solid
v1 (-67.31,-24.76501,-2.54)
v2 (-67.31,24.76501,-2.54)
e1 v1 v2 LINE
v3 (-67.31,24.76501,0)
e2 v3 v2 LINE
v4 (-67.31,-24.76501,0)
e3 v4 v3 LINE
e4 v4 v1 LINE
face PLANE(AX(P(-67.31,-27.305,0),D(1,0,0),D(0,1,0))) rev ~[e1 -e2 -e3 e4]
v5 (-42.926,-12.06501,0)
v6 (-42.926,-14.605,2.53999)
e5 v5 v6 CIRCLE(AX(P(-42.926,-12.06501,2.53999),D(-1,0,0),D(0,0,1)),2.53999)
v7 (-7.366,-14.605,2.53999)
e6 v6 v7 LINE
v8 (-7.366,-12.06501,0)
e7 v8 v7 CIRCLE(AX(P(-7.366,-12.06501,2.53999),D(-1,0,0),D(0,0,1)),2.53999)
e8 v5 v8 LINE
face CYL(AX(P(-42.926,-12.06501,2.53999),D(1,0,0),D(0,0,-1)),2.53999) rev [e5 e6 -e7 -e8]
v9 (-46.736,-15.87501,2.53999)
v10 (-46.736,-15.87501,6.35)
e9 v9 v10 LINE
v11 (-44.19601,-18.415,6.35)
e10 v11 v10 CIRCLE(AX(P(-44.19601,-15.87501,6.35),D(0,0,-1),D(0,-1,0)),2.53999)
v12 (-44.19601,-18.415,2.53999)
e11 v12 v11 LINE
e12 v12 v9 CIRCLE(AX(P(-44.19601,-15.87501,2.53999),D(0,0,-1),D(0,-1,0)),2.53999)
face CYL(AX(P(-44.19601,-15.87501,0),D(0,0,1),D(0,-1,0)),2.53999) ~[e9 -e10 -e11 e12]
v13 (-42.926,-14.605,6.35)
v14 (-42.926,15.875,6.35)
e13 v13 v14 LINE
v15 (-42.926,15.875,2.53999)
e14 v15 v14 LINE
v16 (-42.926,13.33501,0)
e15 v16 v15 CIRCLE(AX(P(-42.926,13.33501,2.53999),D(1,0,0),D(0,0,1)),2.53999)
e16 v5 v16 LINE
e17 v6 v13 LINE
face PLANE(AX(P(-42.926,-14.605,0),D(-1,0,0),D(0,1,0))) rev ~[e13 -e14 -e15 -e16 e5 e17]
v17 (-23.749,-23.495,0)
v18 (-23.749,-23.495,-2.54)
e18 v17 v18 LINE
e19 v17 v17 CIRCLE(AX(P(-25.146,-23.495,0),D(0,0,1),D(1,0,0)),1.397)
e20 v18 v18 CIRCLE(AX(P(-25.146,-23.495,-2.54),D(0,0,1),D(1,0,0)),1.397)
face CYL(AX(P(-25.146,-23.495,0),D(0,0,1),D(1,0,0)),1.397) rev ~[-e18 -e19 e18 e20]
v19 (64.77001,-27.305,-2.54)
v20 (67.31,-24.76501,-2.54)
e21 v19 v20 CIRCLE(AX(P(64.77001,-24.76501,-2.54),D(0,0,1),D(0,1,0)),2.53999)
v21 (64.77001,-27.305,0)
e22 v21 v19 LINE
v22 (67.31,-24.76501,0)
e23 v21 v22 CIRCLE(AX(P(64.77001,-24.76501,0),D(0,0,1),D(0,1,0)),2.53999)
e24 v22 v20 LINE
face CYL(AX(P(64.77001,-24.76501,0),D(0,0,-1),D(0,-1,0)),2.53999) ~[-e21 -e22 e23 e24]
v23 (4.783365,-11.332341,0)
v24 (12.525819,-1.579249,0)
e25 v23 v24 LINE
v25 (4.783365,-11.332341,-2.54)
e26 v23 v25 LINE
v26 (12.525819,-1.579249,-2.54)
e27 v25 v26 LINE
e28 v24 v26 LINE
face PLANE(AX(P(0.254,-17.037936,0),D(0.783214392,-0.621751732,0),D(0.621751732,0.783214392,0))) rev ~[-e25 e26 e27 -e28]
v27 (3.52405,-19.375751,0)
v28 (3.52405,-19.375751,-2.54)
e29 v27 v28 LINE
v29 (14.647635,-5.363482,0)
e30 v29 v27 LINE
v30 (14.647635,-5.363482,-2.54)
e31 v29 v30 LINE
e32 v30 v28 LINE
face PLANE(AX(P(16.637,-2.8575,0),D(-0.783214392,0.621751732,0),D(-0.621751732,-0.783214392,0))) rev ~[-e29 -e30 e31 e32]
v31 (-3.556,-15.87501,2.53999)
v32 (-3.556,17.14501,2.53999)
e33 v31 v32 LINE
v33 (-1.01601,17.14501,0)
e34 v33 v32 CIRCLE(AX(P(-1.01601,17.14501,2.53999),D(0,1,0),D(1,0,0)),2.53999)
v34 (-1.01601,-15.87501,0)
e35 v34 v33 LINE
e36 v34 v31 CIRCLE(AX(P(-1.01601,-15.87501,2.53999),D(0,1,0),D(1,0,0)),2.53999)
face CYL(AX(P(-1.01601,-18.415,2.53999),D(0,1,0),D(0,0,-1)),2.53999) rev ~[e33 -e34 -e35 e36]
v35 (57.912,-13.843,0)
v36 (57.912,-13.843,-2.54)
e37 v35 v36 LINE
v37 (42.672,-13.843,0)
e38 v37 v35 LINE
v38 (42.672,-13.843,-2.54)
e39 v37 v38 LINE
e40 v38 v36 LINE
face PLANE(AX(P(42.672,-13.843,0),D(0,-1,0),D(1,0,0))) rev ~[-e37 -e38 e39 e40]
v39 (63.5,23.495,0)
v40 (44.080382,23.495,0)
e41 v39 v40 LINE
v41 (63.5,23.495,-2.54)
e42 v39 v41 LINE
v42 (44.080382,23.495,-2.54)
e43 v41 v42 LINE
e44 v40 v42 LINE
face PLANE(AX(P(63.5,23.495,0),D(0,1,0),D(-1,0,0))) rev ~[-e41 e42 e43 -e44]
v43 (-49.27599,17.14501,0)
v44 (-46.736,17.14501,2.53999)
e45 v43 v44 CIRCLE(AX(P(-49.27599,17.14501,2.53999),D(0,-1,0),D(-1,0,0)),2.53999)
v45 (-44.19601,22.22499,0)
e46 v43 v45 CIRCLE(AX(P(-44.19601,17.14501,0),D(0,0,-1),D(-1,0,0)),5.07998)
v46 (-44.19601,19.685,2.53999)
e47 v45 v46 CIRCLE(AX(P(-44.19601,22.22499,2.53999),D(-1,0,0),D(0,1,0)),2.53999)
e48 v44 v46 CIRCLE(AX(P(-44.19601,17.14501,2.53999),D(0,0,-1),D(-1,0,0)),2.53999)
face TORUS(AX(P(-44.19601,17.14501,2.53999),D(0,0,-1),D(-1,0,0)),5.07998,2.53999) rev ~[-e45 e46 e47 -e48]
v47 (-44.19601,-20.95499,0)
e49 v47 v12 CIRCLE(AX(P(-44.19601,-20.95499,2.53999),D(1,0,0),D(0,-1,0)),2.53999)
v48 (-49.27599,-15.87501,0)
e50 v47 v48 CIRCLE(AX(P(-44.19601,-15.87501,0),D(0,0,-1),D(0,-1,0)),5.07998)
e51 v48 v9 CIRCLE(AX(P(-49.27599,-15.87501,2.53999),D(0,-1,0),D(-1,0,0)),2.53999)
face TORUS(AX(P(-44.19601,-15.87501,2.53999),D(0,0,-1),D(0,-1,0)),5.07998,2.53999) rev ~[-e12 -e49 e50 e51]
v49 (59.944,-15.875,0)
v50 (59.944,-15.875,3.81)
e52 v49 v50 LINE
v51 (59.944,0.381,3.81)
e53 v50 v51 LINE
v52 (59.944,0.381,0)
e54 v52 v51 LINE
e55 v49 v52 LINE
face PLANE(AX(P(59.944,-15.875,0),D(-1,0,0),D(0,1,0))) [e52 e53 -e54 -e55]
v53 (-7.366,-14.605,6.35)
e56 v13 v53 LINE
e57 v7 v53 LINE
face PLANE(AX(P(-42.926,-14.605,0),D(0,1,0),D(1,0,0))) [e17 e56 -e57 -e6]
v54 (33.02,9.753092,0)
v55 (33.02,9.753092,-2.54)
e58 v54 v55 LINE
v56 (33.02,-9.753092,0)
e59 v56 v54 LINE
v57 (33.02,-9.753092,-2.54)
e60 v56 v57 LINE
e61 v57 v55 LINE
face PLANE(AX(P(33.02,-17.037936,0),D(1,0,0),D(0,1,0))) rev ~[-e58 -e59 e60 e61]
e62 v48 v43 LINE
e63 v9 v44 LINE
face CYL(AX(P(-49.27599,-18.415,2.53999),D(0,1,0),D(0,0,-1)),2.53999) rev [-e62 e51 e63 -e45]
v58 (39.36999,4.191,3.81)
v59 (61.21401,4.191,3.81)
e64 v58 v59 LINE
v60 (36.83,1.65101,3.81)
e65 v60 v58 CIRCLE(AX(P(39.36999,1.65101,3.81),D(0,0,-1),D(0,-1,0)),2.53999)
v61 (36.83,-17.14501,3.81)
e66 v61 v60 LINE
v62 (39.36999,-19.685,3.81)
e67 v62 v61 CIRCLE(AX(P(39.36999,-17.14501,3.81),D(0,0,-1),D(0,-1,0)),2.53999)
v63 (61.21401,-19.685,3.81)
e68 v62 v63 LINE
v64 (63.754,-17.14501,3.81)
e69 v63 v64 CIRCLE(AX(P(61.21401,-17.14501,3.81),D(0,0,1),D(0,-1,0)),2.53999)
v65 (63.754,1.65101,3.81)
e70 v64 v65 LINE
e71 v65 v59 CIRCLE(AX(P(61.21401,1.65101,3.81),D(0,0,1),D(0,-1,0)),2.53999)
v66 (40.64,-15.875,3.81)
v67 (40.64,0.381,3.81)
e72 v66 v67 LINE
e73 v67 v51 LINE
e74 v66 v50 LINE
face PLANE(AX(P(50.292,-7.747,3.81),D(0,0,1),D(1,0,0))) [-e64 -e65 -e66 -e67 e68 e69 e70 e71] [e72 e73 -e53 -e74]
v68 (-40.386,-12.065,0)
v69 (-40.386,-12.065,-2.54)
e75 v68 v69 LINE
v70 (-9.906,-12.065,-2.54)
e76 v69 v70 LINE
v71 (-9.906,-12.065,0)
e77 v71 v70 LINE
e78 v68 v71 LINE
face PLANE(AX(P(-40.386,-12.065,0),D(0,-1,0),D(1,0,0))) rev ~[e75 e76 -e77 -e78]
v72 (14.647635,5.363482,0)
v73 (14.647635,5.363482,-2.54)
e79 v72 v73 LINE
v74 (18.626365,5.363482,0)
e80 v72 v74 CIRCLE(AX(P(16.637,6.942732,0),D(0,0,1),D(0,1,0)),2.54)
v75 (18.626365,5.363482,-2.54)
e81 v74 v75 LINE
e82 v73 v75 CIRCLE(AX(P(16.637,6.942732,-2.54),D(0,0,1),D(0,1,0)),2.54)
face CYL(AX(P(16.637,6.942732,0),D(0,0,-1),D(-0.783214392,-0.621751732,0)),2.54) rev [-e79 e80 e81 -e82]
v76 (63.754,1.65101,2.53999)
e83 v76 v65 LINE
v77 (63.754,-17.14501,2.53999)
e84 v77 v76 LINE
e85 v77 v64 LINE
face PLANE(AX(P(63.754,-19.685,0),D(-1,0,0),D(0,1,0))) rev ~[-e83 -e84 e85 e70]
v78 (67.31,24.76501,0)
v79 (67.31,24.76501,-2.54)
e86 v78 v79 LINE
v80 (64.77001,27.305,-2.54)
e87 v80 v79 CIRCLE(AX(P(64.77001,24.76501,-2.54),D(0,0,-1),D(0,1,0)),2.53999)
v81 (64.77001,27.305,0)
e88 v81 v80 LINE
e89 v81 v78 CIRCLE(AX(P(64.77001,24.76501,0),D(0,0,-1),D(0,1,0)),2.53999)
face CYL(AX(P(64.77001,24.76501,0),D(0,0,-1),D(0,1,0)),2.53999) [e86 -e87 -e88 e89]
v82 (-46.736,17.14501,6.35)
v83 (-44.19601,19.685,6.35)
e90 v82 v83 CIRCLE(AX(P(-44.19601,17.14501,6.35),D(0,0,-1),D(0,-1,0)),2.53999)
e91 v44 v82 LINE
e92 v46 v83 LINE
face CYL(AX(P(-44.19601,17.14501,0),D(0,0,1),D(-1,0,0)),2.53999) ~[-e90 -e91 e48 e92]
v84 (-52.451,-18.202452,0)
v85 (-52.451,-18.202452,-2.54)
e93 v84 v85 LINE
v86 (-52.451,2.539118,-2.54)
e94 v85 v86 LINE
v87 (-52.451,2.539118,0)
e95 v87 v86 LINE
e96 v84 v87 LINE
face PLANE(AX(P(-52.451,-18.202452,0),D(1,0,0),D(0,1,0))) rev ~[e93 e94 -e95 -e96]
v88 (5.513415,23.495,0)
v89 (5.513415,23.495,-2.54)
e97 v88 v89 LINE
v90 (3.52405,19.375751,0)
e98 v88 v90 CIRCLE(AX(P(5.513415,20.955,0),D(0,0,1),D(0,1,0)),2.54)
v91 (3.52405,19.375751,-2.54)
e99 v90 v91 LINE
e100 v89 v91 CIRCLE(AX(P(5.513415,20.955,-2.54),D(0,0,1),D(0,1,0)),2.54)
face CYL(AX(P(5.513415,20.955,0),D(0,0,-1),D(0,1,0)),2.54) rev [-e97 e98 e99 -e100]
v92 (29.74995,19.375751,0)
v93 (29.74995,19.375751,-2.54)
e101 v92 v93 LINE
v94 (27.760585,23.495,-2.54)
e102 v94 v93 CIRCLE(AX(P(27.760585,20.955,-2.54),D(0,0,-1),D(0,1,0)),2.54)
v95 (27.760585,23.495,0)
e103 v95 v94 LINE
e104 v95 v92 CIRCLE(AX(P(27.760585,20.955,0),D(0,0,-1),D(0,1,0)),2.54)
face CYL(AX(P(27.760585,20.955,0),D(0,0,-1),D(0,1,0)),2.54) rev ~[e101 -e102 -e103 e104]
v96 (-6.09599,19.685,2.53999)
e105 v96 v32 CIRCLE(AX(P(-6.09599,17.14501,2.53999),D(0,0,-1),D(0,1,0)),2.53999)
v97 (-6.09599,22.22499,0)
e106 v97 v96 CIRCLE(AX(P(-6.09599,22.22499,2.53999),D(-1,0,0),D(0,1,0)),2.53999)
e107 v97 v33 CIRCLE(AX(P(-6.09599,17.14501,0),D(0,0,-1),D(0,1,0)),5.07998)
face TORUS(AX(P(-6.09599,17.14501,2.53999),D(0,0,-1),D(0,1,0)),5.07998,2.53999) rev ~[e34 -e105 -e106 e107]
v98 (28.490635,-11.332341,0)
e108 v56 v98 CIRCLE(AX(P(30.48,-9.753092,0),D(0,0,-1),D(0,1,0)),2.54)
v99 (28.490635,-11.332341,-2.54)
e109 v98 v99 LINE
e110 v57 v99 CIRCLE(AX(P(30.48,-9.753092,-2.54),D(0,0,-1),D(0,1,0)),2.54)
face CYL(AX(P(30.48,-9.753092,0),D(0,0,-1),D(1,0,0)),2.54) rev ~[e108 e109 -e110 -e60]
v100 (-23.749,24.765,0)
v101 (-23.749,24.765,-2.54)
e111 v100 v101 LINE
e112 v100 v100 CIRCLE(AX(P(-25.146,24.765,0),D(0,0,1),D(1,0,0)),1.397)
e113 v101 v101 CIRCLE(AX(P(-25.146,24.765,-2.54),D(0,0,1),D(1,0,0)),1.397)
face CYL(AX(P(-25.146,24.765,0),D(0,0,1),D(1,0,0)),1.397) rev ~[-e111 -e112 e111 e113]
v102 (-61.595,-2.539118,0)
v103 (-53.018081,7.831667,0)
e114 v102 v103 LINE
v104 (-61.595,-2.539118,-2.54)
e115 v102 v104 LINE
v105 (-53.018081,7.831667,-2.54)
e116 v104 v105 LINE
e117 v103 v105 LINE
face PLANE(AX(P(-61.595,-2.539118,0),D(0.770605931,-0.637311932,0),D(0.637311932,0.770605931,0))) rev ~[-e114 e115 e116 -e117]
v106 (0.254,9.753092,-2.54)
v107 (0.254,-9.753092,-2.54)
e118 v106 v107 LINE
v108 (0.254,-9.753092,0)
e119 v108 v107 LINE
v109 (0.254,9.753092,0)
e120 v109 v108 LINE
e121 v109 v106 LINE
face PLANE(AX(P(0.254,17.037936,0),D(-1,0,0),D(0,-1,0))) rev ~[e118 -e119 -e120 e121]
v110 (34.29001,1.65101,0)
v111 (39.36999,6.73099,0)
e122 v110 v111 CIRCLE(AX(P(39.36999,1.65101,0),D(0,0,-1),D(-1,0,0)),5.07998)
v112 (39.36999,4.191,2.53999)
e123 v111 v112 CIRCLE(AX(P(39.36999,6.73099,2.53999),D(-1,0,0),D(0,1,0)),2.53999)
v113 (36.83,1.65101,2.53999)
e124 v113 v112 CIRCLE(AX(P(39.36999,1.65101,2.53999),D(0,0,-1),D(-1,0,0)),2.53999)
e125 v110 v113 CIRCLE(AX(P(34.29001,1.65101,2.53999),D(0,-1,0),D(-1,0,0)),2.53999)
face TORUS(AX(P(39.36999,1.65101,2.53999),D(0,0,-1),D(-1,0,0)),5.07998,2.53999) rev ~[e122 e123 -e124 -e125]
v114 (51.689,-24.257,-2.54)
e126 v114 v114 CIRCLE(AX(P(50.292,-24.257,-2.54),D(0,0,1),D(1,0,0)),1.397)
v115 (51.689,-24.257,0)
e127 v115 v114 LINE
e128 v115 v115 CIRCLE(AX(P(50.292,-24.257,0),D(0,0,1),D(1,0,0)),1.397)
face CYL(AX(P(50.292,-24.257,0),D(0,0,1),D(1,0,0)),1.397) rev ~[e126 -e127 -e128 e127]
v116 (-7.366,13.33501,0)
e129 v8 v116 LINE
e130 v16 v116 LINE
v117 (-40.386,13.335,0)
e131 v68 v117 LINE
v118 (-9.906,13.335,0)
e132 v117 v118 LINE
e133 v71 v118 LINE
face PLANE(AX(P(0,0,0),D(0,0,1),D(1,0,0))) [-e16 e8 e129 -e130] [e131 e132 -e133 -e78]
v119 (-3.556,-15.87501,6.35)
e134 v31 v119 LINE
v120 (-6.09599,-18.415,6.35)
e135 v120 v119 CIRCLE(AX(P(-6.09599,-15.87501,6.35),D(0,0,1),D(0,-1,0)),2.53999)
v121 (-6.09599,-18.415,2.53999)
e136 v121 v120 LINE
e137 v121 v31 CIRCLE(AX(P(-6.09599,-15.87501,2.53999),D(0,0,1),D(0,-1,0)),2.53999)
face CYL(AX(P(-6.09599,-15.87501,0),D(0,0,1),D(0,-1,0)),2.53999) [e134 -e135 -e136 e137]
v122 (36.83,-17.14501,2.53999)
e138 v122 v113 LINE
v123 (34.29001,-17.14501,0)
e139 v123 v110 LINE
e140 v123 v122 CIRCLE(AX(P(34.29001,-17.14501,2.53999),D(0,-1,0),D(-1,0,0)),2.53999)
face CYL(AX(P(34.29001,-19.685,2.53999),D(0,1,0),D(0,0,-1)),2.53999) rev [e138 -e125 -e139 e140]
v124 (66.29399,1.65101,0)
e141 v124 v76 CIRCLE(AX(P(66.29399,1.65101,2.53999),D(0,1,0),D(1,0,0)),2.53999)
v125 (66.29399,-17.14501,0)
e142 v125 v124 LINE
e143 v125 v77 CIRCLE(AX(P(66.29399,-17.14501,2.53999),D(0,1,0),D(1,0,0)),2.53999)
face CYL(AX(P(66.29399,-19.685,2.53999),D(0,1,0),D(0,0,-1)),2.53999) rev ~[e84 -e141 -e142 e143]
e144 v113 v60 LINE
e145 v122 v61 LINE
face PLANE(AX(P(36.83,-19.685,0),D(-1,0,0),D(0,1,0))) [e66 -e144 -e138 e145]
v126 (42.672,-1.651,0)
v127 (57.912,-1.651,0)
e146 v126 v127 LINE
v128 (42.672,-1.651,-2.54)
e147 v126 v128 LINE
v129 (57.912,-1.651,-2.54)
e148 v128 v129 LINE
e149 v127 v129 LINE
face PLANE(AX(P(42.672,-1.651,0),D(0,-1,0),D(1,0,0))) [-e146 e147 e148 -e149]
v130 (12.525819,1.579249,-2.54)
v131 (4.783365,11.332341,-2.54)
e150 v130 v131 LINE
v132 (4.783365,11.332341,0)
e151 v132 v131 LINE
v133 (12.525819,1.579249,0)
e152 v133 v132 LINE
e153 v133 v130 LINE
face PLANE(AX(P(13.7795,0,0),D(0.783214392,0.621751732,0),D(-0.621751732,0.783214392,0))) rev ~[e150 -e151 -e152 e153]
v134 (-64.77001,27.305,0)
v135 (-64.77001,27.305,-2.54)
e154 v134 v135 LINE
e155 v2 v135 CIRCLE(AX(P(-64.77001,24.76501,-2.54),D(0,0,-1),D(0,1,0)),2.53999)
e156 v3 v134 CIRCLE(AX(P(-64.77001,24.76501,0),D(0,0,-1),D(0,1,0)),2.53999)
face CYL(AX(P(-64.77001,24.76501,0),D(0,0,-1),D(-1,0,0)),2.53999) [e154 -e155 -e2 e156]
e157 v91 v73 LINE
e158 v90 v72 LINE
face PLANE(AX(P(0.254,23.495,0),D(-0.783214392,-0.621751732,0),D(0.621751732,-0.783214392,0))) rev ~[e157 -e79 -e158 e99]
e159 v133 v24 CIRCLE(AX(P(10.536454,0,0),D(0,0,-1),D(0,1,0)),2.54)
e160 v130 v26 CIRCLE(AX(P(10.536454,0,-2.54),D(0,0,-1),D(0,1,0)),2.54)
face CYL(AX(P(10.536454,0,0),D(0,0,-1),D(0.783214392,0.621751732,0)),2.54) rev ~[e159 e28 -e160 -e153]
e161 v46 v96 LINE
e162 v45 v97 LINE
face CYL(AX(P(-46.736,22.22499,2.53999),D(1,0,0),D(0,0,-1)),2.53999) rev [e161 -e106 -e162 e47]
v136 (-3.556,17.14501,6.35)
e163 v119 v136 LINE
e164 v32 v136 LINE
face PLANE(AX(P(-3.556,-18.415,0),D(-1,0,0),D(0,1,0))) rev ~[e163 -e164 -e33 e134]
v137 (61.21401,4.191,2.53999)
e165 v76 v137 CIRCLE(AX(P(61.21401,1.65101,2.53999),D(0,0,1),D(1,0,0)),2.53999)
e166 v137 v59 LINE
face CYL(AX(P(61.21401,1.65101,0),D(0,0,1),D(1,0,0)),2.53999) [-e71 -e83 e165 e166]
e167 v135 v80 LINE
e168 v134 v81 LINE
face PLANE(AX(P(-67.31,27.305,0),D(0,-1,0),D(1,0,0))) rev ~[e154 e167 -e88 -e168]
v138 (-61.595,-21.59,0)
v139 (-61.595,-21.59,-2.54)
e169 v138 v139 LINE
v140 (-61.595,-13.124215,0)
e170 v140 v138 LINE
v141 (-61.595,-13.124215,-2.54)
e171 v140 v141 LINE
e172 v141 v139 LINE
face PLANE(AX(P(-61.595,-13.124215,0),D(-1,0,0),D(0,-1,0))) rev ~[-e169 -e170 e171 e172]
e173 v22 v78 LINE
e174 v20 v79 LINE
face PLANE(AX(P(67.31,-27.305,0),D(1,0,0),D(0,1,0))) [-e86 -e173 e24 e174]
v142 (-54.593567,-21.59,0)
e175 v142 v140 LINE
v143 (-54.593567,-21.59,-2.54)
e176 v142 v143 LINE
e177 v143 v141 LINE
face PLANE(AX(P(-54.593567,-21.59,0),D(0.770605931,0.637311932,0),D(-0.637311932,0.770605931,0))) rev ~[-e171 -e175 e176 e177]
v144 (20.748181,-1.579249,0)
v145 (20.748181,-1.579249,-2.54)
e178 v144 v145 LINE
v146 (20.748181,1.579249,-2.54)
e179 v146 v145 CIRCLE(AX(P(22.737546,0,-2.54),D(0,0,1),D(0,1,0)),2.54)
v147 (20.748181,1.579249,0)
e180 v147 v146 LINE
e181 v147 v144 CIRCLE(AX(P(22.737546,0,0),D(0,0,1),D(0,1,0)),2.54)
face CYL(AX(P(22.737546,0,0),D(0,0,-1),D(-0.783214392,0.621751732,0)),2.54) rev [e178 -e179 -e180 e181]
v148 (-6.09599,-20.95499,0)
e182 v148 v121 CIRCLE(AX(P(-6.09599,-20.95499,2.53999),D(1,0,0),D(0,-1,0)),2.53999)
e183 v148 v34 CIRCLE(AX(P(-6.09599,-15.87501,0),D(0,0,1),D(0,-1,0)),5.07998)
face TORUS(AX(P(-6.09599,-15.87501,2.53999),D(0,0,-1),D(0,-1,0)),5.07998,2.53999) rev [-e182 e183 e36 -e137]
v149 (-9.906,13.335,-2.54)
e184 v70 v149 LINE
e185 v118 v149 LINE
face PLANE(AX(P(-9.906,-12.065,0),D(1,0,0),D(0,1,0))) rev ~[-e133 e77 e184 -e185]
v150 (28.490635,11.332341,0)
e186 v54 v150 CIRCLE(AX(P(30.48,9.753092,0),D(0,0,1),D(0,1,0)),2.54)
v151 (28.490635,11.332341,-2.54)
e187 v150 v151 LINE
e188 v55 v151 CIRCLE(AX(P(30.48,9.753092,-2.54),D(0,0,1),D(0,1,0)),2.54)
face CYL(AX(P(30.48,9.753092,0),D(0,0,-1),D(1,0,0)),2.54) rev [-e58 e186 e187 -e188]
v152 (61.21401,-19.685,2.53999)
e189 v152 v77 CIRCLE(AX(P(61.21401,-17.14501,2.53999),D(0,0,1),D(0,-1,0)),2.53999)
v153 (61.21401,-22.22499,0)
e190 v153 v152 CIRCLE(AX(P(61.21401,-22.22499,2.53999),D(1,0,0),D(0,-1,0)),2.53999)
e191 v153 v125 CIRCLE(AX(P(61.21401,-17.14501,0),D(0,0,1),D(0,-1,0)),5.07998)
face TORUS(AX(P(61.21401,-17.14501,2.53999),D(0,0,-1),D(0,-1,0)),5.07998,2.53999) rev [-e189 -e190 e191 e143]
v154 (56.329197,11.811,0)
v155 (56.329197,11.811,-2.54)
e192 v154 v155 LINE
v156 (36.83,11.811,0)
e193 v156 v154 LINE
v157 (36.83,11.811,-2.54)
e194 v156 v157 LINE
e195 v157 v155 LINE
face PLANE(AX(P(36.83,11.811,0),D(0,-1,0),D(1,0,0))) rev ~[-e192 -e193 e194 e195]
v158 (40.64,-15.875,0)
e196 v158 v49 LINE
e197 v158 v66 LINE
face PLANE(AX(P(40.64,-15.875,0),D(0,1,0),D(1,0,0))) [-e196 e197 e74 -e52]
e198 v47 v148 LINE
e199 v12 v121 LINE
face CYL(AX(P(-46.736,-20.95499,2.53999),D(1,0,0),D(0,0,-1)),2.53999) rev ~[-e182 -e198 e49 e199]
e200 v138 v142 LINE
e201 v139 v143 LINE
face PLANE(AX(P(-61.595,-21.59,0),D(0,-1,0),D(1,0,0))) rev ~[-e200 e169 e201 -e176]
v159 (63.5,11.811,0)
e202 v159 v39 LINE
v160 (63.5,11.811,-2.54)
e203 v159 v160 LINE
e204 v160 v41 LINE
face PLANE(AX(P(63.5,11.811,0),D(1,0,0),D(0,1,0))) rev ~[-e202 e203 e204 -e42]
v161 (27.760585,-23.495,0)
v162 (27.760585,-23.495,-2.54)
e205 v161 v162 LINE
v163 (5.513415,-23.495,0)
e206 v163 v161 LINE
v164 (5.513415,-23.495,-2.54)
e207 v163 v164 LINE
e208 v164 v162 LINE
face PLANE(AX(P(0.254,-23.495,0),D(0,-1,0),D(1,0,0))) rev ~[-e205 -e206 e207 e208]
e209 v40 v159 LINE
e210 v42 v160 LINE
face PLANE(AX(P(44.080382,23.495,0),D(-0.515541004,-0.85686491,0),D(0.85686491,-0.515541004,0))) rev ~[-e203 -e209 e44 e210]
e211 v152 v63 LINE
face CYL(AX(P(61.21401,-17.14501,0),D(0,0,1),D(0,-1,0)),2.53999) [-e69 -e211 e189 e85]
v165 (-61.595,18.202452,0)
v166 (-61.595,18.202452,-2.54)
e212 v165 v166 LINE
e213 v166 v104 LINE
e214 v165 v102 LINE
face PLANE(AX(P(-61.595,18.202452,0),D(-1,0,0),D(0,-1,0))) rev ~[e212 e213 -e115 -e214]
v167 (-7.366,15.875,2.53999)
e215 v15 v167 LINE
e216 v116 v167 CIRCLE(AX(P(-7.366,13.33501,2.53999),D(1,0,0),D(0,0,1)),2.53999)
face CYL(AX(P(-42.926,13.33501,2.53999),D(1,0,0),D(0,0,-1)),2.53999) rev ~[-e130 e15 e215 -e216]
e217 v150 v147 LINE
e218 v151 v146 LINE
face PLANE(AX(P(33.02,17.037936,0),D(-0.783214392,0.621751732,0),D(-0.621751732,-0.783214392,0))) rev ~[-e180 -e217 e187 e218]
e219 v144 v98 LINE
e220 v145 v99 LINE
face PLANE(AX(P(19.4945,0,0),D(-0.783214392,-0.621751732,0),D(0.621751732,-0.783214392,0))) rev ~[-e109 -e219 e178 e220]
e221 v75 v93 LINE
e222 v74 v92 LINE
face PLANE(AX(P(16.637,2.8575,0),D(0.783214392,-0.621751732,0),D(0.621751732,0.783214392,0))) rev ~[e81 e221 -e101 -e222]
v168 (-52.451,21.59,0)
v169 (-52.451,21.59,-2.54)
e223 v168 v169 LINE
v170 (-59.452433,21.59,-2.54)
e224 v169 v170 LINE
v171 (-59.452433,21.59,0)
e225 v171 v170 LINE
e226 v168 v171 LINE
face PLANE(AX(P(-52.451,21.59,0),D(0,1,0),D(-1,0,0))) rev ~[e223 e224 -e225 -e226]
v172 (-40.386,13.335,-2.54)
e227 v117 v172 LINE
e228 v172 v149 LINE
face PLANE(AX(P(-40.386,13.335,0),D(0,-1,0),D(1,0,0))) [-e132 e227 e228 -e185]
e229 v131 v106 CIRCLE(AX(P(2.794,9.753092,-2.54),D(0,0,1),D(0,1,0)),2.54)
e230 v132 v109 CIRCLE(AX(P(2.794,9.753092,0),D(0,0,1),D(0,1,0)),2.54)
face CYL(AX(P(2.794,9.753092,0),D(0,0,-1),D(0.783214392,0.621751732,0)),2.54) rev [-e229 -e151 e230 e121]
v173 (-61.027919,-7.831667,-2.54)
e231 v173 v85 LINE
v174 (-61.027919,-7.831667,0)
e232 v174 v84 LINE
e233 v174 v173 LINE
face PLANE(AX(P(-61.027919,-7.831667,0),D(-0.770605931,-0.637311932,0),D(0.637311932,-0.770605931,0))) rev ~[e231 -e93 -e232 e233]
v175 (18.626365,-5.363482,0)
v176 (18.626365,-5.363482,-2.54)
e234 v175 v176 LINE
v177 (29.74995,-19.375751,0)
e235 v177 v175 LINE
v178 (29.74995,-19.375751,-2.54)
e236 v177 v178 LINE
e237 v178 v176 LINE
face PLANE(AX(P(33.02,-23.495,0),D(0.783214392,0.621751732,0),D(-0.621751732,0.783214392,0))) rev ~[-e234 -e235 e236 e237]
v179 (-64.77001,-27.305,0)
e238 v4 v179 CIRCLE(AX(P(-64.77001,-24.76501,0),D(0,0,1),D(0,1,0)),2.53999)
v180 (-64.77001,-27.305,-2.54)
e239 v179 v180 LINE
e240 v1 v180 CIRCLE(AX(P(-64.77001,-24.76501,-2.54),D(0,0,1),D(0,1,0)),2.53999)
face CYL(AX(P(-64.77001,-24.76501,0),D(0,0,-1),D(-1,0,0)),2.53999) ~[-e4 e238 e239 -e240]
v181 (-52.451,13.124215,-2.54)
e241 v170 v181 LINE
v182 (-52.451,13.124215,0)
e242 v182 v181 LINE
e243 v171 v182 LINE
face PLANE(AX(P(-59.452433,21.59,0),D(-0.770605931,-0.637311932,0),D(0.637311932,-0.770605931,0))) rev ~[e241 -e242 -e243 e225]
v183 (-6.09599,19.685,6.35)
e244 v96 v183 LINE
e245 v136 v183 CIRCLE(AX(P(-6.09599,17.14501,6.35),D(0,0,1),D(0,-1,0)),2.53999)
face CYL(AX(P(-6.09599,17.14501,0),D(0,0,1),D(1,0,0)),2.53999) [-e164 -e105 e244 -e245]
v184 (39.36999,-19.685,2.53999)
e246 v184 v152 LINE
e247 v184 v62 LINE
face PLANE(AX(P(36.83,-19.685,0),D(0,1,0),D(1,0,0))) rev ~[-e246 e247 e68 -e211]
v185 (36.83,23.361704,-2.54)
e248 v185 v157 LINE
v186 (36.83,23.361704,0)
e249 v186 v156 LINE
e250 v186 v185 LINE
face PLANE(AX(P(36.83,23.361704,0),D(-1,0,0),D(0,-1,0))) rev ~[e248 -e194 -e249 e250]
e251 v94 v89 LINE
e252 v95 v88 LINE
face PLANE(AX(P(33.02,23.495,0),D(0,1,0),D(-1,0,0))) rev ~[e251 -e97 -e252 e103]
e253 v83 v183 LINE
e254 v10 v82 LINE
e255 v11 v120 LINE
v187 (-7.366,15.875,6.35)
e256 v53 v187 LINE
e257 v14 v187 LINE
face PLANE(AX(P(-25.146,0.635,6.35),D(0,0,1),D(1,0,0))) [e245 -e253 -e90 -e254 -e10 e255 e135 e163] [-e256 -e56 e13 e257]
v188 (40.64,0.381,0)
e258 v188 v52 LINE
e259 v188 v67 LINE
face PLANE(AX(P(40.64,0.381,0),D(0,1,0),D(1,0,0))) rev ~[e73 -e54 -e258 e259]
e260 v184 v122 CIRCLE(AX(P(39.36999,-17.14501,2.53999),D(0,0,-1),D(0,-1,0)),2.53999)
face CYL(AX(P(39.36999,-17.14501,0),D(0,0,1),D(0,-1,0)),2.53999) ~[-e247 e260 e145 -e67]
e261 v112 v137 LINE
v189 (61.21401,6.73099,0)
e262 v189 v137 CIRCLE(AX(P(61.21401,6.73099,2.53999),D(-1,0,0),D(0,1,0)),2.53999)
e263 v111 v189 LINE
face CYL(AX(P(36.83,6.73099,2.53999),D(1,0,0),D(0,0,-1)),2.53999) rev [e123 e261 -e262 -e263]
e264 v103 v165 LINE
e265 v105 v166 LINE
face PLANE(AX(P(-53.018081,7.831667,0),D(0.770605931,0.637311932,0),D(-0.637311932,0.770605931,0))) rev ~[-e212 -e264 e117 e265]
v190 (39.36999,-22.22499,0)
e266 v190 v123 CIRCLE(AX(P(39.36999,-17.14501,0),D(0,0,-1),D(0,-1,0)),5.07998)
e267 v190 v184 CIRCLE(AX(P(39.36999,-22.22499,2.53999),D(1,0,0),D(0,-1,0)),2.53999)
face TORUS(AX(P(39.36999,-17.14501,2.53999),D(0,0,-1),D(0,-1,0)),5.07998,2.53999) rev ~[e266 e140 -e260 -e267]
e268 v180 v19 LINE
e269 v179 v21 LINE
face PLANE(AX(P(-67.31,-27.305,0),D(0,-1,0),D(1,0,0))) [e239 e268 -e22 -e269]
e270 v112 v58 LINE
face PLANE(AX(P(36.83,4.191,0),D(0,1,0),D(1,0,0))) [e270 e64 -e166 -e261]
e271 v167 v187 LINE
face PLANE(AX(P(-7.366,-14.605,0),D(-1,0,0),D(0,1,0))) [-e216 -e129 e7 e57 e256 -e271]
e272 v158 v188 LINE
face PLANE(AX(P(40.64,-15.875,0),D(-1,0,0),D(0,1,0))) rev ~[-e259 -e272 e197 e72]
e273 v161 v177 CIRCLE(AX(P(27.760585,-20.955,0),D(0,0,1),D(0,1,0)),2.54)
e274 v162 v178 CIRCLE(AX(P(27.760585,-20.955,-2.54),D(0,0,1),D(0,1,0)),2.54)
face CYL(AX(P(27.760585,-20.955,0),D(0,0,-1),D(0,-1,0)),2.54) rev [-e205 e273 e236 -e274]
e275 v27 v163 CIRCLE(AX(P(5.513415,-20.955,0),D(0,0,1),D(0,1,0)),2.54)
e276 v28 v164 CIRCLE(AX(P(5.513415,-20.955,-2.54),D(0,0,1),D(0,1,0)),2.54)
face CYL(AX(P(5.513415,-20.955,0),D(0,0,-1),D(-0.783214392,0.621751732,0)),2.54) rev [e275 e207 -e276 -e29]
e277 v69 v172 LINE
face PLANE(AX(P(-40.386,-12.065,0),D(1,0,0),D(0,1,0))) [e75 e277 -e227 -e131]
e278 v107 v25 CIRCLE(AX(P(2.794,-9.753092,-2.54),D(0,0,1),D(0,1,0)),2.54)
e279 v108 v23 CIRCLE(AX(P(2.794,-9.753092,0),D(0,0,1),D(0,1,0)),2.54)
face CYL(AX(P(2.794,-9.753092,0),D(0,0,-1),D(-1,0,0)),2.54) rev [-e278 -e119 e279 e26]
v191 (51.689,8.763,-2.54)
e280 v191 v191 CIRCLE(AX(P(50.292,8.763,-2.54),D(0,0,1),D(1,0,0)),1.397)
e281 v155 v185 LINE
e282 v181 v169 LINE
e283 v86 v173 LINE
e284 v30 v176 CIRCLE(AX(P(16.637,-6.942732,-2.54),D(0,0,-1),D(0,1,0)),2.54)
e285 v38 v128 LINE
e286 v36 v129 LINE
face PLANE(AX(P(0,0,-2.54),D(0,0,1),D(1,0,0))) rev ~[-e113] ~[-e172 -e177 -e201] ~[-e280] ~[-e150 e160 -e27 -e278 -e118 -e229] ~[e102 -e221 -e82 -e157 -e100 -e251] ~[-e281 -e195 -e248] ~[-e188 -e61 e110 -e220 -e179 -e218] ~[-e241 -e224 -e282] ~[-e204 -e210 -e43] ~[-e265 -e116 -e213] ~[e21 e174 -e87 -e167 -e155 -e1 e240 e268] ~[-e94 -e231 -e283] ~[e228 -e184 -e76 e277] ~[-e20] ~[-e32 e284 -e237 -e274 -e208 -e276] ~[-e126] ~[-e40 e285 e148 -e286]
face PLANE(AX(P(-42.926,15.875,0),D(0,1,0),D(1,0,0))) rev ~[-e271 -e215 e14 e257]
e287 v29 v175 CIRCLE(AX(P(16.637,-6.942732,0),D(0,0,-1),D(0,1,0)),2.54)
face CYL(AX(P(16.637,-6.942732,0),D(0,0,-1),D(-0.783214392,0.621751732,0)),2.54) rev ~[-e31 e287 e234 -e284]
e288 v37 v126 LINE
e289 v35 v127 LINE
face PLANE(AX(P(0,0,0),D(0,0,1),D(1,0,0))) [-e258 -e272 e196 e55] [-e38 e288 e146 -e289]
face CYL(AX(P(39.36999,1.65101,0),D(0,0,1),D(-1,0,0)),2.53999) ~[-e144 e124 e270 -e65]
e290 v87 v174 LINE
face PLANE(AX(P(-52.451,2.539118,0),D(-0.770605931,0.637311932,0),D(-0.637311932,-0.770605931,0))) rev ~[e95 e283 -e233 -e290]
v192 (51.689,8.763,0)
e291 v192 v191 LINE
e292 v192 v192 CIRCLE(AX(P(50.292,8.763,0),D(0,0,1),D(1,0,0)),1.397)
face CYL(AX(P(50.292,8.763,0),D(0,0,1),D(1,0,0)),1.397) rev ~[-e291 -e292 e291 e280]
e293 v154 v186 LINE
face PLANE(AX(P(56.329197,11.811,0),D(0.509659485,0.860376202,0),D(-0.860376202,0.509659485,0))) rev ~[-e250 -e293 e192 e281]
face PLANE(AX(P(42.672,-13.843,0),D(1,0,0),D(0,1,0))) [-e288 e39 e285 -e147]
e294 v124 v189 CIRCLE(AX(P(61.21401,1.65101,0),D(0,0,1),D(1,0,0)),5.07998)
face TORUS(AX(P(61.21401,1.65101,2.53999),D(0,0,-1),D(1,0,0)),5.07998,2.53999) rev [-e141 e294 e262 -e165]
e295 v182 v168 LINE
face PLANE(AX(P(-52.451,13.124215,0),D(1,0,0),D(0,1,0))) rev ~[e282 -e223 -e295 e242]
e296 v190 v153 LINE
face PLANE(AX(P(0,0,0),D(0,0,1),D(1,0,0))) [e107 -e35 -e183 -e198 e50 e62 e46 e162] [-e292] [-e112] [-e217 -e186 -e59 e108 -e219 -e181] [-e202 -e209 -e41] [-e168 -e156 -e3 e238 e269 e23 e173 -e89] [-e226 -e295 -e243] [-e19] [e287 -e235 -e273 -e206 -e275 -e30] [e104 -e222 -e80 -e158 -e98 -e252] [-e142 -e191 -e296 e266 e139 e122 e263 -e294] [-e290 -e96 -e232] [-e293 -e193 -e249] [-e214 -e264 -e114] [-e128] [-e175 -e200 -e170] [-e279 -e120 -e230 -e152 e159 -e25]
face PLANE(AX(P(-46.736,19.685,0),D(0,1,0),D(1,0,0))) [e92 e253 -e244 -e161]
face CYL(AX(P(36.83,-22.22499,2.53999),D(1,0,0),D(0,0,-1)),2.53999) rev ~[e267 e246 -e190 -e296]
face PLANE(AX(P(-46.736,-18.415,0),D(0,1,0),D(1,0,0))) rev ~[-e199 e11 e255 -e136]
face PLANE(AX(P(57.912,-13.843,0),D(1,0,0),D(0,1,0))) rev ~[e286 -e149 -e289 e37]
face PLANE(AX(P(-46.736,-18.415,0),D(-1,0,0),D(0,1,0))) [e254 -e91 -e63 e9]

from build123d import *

# Parameters (mm, degrees)
F0_W     = 134.62
F0_H     = 54.61
F1_DEPTH = 2.54
F2_R     = 1.397
F3_DEPTH = 2.541
F2_W     = 43.18
F2_H     = 38.1
F2_W_2   = 35.56
F2_H_2   = 30.48
F4_DEPTH = 6.35
F2_W_3   = 26.924
F2_H_3   = 23.876
F2_W_4   = 19.304
F2_H_4   = 16.256
F5_DEPTH = 3.81
F6_W     = 30.48
F6_H     = 25.4
F6_W_2   = 15.24
F6_H_2   = 12.192
F7_DEPTH = 2.541
F8_R     = 2.53999
F9_R     = 2.54


# Not quite as in the source:
# - a fillet or chamfer is up to 0.001 mm smaller than in the source, because OpenCascade refuses the exact size
# - a feature names something its author has since deleted; it is built from what else it names


with BuildPart() as f1:
    # F0 (on Top) → F1 (new body)
    with BuildSketch(Plane.XY):
        Rectangle(F0_W, F0_H)
    extrude(amount=-F1_DEPTH)

    # F2 (on face) → F3 (cut, through all)
    with BuildSketch(Plane.XY):
        with Locations((-25.146, 24.765)):
            Circle(F2_R)
        with Locations((-25.146, -23.495)):
            Circle(F2_R)
        with Locations((50.292, 8.763)):
            Circle(F2_R)
        with Locations((50.292, -24.257)):
            Circle(F2_R)
    extrude(amount=-F3_DEPTH, mode=Mode.SUBTRACT)

    # F2 (on face) → F4 (join)
    with BuildSketch(Plane.XY):
        with Locations((-25.146, 0.635)):
            Rectangle(F2_W, F2_H)
        with Locations((-25.146, 0.635)):
            Rectangle(F2_W_2, F2_H_2, mode=Mode.SUBTRACT)
    extrude(amount=F4_DEPTH)

    # F2 (on face) → F5 (join)
    with BuildSketch(Plane.XY):
        with Locations((50.292, -7.747)):
            Rectangle(F2_W_3, F2_H_3)
        with Locations((50.292, -7.747)):
            Rectangle(F2_W_4, F2_H_4, mode=Mode.SUBTRACT)
    extrude(amount=F5_DEPTH)

    # F6 (on face) → F7 (cut, through all)
    with BuildSketch(Plane.XY):
        Polygon((13.7795, 0), (0.254, 17.0379360465), (0.254, -17.0379360465), align=None)
        Polygon((33.02, 23.495), (0.254, 23.495), (16.637, 2.8575), align=None)
        Polygon((33.02, -17.0379360465), (33.02, 17.0379360465), (19.4945, 0), align=None)
        Polygon((16.637, -2.8575), (0.254, -23.495), (33.02, -23.495), align=None)
        Polygon((56.3291969075, 11.811), (36.83, 23.3617037719), (36.83, 11.811), align=None)
        Polygon((63.5, 23.495), (44.0803815263, 23.495), (63.5, 11.811), align=None)
        with Locations((-25.146, 0.635)):
            Rectangle(F6_W, F6_H)
        with Locations((50.292, -7.747)):
            Rectangle(F6_W_2, F6_H_2)
        Polygon((-53.0180806356, 7.8316666667), (-61.595, 18.202451519), (-61.595, -2.5391181857), align=None)
        Polygon((-52.451, 21.59), (-59.4524328779, 21.59), (-52.451, 13.1242151477), align=None)
        Polygon((-52.451, -18.202451519), (-52.451, 2.5391181857), (-61.0279193644, -7.8316666667), align=None)
        Polygon((-54.5935671221, -21.59), (-61.595, -13.1242151477), (-61.595, -21.59), align=None)
    extrude(amount=-F7_DEPTH, mode=Mode.SUBTRACT)

    # F8 (radius 2.54 in the source; OpenCascade refuses exactly that, so slightly less here)
    f8_edges = [f1.edges().sort_by_distance(p)[0] for p in [
        (-25.146, -18.415, 0),
        (-46.736, 0.635, 0),
        (50.292, -19.685, 0),
        (36.83, -7.747, 0),
        (-25.146, 19.685, 0),
        (-3.556, 0.635, 0),
        (63.754, -7.747, 0),
        (50.292, 4.191, 0),
        (63.754, 4.191, 1.905),
        (63.754, -19.685, 1.905),
        (-3.556, 19.685, 3.175),
        (-3.556, -18.415, 3.175),
        (36.83, -19.685, 1.905),
        (-46.736, -18.415, 3.175),
        (-46.736, 19.685, 3.175),
        (36.83, 4.191, 1.905),
        (-25.146, 15.875, 0),
        (-25.146, -14.605, 0),
        (-67.31, -27.305, -1.27),
        (-67.31, 27.305, -1.27),
        (67.31, 27.305, -1.27),
        (67.31, -27.305, -1.27),
    ]]
    fillet(f8_edges, radius=F8_R)

    # F9
    f9_edges = [f1.edges().sort_by_distance(p)[0] for p in [
        (33.02, 23.495, -1.27),
        (13.7795, 0, -1.27),
        (16.637, -2.8575, -1.27),
        (0.254, 17.037936, -1.27),
        (33.02, 17.037936, -1.27),
        (33.02, -17.037936, -1.27),
        (33.02, -23.495, -1.27),
        (0.254, 23.495, -1.27),
        (0.254, -23.495, -1.27),
        (0.254, -17.037936, -1.27),
        (19.4945, 0, -1.27),
        (16.637, 2.8575, -1.27),
    ]]
    fillet(f9_edges, radius=F9_R)


solid = f1.part
